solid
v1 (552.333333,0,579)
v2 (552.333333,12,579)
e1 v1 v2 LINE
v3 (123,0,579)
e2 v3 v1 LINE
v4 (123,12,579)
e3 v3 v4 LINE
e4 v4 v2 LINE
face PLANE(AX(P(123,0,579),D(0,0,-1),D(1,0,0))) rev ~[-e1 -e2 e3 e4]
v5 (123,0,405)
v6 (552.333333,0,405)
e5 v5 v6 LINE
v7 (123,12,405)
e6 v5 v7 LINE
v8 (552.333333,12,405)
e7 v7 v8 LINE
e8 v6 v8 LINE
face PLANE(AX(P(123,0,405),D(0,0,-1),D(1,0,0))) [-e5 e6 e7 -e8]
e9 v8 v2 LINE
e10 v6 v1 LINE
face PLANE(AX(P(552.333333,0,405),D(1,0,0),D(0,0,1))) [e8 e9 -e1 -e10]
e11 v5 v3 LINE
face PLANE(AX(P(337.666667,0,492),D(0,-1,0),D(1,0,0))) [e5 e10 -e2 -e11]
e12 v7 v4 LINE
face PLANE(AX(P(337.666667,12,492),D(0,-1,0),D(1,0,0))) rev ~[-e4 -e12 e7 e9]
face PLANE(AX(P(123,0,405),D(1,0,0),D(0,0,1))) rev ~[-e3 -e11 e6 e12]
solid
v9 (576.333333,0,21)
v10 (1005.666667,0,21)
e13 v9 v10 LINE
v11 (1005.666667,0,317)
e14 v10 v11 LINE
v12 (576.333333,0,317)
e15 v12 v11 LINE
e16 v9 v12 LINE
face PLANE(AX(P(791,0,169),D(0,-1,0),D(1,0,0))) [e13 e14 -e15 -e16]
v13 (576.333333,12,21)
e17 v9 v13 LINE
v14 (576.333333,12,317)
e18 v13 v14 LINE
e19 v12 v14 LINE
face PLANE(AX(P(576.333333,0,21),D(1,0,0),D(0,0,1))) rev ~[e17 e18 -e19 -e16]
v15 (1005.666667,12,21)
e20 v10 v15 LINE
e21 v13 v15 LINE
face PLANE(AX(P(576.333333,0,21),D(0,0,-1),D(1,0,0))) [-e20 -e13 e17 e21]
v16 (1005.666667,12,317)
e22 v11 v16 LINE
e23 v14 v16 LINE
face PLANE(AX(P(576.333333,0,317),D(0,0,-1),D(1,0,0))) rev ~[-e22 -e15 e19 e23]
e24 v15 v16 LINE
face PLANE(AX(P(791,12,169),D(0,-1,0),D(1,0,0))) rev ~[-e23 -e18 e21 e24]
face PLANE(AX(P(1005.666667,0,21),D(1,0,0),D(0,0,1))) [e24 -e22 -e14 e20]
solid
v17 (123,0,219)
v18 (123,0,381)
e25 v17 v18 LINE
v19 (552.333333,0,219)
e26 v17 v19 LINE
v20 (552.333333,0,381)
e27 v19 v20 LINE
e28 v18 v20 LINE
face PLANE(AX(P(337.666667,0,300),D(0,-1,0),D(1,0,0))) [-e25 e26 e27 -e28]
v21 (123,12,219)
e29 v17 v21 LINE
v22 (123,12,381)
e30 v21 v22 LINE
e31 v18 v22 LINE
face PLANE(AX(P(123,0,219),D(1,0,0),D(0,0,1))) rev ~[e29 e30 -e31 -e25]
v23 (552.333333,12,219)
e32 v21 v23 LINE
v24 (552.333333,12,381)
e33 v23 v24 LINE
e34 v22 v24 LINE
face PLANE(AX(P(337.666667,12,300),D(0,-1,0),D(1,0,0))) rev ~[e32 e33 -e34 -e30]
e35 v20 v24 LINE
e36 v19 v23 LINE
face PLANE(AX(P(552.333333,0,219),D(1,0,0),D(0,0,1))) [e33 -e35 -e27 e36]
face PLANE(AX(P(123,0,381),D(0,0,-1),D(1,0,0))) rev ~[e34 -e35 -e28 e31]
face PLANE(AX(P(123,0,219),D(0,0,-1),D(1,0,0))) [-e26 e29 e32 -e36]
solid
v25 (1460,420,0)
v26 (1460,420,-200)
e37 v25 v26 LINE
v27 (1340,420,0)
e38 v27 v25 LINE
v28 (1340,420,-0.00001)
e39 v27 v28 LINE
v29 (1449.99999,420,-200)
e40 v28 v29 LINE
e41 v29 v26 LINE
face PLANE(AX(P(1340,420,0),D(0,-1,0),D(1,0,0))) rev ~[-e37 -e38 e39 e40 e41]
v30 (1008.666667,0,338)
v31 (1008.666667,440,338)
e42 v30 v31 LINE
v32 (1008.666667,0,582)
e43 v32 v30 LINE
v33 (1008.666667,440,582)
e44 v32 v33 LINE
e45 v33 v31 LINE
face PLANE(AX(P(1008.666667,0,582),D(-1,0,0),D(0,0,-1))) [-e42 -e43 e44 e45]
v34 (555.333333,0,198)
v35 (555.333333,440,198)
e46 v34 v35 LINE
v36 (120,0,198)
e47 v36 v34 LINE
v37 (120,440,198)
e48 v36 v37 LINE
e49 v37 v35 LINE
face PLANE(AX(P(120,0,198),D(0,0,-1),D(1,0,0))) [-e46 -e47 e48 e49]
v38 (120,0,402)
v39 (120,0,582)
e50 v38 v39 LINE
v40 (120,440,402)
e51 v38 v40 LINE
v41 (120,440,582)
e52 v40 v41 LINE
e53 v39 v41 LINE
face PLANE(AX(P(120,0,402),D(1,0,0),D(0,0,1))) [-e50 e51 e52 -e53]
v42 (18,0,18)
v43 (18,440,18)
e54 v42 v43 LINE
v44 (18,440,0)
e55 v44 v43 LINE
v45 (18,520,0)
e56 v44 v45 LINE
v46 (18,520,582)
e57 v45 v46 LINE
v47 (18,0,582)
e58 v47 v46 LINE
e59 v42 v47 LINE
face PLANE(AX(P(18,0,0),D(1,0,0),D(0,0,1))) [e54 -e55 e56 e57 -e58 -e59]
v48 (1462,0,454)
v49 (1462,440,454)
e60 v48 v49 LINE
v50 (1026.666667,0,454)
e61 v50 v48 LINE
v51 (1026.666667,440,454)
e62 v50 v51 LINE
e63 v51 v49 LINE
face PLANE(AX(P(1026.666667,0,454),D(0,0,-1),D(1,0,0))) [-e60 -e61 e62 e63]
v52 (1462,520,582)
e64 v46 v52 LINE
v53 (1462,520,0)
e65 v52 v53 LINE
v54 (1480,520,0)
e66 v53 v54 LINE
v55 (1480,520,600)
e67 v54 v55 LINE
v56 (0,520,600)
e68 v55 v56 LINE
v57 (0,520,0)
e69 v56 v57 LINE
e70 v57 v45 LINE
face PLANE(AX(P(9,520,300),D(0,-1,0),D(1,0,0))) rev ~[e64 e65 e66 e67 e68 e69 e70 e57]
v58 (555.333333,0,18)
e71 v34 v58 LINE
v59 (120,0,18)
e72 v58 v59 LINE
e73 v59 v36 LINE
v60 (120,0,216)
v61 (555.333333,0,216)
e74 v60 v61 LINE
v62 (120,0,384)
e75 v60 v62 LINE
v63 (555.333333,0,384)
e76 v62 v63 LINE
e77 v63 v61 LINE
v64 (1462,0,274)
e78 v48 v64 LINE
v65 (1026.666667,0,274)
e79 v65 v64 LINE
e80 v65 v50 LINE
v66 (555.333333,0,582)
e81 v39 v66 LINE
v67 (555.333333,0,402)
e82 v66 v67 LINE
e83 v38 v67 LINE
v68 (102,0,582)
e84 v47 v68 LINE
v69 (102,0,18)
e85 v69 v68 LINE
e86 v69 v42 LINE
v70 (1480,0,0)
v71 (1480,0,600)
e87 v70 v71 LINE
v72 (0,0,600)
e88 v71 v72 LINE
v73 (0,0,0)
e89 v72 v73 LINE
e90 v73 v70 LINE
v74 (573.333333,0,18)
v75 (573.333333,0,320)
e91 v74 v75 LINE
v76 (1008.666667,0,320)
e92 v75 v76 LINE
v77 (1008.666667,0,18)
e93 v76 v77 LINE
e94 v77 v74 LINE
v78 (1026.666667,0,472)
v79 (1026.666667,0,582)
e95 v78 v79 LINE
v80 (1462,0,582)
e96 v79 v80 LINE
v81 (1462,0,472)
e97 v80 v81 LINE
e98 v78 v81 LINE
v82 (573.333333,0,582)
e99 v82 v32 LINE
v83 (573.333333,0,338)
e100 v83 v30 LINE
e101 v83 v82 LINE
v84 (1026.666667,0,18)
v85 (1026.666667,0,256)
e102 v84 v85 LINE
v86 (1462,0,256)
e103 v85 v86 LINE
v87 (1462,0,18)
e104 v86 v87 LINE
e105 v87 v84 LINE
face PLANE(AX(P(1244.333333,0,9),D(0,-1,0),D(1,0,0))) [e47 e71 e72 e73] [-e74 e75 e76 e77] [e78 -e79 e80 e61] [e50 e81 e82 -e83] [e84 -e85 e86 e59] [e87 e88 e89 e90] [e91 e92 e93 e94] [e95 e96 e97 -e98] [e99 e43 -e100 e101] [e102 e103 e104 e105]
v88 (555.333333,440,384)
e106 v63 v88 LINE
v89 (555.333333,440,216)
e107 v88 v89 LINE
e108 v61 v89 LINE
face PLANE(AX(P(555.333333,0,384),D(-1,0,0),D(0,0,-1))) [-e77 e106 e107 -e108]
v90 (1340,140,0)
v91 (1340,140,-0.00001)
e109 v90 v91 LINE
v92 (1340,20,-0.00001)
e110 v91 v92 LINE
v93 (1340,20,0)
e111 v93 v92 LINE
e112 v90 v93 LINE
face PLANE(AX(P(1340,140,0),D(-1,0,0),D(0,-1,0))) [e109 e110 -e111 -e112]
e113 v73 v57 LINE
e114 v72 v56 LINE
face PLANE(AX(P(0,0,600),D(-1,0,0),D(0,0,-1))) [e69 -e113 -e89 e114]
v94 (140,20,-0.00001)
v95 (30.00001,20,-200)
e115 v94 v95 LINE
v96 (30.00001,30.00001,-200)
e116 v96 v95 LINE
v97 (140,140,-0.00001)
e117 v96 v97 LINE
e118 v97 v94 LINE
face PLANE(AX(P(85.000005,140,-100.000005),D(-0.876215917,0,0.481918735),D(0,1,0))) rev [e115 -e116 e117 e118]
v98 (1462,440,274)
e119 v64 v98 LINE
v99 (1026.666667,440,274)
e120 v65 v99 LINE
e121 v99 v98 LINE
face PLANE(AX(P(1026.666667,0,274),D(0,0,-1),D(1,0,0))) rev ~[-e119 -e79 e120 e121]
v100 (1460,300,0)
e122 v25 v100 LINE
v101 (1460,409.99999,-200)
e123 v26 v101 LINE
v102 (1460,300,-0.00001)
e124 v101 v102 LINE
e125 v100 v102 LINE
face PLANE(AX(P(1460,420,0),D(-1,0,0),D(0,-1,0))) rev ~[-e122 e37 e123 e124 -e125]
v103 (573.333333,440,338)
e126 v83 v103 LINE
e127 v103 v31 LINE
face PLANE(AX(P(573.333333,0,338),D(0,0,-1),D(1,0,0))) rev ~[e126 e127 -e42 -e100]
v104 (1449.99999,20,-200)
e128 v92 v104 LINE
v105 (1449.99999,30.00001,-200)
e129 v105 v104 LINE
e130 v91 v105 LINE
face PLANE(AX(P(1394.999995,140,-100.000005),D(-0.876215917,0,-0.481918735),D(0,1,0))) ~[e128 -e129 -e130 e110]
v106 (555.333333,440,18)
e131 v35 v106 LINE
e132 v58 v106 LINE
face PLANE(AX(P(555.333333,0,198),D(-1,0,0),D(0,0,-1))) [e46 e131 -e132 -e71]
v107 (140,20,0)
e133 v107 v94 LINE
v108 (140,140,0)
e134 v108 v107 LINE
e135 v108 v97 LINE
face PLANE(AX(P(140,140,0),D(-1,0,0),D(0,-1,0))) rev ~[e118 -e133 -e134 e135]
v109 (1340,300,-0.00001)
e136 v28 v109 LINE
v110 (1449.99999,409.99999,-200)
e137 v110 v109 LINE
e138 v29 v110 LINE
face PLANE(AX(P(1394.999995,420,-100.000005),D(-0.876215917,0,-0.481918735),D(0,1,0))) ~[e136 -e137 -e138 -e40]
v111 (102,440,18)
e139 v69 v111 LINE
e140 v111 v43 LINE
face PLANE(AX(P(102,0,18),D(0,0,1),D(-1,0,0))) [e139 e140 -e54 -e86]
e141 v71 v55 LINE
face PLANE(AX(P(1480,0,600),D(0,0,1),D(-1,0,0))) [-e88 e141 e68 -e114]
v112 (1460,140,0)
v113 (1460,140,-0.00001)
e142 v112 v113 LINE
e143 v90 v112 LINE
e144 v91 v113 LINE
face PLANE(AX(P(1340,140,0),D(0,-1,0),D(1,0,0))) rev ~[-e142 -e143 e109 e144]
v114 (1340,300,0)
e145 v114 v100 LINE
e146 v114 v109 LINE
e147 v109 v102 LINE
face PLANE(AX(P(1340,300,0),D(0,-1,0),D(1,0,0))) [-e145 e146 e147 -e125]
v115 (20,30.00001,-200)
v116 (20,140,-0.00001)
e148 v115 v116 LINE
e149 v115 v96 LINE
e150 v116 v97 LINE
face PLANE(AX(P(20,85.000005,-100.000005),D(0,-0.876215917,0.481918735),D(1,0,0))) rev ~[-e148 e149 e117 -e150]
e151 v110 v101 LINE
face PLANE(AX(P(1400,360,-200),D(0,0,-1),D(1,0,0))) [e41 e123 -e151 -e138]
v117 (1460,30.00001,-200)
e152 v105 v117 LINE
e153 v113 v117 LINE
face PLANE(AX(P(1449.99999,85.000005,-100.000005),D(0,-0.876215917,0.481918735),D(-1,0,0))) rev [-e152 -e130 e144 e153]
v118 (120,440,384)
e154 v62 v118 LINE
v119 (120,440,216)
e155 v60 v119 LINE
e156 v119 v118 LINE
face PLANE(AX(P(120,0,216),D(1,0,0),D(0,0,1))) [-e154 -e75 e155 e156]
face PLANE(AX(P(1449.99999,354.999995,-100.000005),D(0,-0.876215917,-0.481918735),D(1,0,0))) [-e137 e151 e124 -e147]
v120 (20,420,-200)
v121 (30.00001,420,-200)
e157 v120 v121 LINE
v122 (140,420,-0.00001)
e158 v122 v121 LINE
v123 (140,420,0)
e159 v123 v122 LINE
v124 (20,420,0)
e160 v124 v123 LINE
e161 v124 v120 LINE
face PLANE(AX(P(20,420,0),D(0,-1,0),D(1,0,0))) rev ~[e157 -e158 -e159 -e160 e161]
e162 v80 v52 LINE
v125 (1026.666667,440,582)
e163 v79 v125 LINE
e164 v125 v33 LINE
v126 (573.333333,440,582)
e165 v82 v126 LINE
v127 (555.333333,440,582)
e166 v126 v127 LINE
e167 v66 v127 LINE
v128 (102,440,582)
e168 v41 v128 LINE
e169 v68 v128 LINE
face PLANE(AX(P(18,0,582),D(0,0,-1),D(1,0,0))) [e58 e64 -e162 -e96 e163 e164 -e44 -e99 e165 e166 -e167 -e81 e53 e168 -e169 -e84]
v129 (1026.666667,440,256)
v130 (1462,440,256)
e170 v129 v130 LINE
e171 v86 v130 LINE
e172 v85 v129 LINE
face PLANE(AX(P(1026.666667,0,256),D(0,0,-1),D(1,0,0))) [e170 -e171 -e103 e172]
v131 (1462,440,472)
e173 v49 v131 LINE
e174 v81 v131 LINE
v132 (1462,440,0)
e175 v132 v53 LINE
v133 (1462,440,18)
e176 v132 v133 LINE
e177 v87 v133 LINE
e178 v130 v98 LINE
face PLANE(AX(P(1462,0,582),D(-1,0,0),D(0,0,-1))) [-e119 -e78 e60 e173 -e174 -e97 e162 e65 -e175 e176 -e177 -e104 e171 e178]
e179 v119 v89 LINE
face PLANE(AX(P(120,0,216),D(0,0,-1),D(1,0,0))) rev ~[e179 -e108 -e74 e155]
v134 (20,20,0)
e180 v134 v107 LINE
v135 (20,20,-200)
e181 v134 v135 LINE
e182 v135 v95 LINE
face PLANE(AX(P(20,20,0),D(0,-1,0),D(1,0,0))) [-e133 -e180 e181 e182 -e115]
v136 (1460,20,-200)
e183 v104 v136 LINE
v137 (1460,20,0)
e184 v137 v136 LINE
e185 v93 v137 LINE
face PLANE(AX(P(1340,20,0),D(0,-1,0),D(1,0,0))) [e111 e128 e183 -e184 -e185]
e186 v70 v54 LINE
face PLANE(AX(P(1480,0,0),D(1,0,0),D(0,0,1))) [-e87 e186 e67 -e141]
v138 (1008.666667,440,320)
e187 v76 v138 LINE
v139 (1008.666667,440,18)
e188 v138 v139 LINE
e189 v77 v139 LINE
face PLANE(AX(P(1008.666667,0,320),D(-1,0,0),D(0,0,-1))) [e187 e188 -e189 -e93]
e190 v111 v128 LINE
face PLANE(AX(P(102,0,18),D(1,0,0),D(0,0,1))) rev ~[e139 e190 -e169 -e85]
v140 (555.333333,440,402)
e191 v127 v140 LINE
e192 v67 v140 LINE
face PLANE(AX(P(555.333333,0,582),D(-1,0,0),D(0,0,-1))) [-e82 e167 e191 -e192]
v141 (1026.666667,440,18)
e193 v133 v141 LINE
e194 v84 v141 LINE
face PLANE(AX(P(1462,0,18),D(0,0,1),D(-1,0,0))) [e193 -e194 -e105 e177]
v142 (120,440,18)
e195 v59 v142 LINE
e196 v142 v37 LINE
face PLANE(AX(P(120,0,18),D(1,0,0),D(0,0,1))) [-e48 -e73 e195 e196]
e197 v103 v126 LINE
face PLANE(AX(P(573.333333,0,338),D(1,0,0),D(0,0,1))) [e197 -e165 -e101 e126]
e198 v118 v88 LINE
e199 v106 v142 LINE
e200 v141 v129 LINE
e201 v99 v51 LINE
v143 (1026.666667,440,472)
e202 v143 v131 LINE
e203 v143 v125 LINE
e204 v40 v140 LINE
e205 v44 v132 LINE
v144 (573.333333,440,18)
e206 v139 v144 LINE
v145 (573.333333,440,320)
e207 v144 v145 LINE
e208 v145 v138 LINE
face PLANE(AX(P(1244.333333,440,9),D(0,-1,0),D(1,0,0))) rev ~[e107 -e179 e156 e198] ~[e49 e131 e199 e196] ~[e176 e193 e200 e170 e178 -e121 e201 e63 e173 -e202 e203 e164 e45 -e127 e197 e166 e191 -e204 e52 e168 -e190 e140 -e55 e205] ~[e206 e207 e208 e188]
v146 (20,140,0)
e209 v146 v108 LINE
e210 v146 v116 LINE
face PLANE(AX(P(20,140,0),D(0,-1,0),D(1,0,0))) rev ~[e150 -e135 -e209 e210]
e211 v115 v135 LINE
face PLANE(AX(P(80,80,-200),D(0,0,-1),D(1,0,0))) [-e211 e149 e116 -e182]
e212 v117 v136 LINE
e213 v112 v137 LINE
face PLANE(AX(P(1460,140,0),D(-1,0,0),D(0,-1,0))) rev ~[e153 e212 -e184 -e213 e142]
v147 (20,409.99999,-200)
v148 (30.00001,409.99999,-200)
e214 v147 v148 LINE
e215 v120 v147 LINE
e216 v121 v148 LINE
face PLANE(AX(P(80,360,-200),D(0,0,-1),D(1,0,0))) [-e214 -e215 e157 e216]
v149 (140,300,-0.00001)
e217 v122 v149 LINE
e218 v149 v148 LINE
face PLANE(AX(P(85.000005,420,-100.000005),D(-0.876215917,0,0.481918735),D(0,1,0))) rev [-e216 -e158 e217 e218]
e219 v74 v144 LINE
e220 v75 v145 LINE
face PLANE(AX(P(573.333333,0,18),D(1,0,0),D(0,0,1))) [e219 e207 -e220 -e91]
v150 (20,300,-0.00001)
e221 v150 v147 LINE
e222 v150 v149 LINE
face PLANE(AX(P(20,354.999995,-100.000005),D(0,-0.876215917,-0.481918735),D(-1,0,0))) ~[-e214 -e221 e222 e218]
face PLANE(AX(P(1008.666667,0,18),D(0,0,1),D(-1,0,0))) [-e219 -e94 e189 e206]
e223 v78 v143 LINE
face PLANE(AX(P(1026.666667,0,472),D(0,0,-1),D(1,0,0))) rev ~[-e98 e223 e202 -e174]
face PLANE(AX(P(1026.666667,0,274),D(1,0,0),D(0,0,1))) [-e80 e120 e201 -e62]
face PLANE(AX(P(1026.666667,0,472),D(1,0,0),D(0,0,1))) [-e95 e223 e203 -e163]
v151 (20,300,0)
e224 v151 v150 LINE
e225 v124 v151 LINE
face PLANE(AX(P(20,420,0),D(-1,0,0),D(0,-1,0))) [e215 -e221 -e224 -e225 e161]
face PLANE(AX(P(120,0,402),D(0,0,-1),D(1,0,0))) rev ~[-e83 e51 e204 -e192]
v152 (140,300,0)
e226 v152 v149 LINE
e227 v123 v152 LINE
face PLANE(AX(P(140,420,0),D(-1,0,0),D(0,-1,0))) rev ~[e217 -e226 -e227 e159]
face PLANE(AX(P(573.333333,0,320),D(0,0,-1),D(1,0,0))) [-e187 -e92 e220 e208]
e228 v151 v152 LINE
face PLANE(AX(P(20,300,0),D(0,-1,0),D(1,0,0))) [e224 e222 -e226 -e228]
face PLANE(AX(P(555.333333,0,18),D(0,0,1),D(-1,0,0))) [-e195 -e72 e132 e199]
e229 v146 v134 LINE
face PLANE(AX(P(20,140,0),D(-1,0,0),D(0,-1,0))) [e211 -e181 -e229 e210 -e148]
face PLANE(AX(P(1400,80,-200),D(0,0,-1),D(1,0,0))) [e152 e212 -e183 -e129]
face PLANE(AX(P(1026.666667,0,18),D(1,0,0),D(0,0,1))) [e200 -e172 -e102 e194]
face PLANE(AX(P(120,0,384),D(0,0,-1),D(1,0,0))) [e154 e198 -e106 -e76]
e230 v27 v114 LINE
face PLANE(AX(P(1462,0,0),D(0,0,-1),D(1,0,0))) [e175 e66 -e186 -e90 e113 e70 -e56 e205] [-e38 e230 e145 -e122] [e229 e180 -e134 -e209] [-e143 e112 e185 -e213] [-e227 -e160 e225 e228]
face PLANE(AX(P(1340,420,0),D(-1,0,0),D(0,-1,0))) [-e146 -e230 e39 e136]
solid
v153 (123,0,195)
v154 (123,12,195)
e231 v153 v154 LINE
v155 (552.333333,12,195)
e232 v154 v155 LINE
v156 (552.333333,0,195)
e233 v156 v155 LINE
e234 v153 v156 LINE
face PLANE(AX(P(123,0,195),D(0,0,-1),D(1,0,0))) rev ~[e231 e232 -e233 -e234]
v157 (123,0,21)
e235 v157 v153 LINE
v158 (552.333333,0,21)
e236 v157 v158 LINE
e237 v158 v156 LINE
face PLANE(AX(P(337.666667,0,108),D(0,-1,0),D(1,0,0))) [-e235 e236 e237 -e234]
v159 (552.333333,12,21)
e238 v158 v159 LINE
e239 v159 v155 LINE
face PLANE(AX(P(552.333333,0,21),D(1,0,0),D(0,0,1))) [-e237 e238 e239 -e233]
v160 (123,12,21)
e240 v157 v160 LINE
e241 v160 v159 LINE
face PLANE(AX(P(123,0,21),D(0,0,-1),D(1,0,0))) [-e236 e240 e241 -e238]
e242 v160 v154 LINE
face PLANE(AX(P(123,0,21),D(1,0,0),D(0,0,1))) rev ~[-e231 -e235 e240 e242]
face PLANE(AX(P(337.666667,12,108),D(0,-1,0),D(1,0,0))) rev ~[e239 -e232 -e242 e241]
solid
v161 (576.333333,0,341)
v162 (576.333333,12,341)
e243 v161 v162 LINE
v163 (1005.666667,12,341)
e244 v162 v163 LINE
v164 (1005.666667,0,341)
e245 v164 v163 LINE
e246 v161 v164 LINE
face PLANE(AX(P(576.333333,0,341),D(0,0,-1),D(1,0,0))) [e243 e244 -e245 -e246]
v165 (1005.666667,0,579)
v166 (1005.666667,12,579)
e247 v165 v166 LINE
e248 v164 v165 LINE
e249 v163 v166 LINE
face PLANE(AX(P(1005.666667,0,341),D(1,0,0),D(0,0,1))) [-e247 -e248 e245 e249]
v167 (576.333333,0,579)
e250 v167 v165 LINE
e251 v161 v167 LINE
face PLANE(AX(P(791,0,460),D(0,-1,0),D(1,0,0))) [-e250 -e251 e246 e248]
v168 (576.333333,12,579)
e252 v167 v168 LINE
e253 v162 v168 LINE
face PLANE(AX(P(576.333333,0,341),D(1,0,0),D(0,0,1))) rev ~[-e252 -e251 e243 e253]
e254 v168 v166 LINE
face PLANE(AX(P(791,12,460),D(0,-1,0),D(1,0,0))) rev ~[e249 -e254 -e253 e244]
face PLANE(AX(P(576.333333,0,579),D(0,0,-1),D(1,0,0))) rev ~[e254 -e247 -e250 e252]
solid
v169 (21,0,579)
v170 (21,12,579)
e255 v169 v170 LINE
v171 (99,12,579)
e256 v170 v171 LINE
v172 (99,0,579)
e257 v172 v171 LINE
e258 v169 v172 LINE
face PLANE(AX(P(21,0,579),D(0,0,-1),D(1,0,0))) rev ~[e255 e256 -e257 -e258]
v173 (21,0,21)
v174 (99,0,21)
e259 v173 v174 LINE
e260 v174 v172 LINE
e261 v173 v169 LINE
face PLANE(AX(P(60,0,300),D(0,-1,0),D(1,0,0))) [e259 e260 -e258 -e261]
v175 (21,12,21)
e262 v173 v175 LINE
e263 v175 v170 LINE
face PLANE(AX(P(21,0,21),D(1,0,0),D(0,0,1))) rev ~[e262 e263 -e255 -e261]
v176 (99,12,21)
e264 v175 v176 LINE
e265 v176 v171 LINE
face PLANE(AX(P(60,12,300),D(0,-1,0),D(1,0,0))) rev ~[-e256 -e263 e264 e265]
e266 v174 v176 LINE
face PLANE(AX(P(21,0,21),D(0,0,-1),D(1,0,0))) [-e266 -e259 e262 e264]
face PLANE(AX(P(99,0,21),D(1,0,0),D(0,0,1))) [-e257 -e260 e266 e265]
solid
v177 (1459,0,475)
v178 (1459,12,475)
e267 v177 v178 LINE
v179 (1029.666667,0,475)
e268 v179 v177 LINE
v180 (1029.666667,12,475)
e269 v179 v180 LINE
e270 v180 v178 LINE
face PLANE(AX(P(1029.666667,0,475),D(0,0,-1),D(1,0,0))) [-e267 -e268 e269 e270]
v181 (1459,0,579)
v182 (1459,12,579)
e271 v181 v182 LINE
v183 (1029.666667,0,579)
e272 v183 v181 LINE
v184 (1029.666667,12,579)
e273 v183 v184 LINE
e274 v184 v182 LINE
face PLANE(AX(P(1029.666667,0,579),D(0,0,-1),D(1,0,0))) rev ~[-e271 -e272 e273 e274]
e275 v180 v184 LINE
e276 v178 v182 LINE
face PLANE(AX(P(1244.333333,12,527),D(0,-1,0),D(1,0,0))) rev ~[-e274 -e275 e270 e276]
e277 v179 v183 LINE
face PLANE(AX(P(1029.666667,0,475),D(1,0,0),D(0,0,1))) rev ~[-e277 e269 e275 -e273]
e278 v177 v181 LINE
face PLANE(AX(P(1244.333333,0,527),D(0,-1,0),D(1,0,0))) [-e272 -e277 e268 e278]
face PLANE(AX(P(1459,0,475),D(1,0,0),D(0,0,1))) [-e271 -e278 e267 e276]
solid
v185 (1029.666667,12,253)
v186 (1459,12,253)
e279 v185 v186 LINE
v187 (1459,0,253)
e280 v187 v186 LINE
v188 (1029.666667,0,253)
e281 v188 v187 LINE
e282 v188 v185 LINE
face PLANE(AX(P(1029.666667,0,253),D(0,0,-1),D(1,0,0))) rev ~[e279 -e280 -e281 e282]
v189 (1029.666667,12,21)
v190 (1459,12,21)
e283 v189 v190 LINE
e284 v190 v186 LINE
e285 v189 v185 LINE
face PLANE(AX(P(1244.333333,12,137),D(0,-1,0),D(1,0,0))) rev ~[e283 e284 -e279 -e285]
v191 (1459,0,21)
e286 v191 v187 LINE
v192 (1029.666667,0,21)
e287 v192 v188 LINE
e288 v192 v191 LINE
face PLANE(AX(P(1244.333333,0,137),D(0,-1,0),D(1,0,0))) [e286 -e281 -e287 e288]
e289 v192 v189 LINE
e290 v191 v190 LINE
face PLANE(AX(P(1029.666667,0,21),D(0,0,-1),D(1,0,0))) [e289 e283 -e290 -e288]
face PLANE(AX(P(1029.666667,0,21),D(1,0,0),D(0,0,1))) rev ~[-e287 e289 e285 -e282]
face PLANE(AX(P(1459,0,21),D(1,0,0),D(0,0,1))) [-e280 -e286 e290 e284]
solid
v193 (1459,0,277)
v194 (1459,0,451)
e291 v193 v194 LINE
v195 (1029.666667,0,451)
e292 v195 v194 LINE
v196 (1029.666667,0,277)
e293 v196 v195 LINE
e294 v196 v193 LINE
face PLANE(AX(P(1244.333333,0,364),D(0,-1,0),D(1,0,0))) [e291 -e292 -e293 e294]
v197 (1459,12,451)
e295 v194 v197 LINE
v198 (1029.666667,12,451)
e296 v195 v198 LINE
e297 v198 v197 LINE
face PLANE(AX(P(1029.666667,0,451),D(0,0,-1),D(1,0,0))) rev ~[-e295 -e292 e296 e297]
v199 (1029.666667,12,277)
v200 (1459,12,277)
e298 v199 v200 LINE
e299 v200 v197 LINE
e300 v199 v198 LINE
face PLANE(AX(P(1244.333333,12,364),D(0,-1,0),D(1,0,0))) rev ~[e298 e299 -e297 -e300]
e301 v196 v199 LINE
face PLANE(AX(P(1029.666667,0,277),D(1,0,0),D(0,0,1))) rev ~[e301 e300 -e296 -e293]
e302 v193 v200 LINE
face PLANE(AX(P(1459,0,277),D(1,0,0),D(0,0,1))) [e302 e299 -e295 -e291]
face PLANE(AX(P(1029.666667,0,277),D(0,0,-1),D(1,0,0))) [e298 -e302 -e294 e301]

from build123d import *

# Parameters (mm, degrees)
F2_W        = 18
F2_H        = 564
F2_H_2      = 18
F2_W_2      = 84
F2_W_3      = 9
F2_W_4      = 435.3333333333
F3_DEPTH    = 520
F4_DEPTH    = 440
F5_W        = 78
F5_H        = 558
F6_DEPTH    = 12
F5_W_2      = 429.3333333333
F5_H_2      = 174
F5_H_3      = 162
F5_H_4      = 238
F5_H_5      = 296
F5_H_6      = 232
F5_H_7      = 104
F7_W        = 120
F7_H        = 120
F8_DEPTH    = 200
F9_SIZE2    = 109.99999
F9_SIZE     = 199.99999
F9_2_SIZE2  = 109.99999
F9_2_SIZE   = 199.99999
F10_SIZE2   = 199.99999
F10_SIZE    = 109.99999
F10_2_SIZE2 = 199.99999
F10_2_SIZE  = 109.99999
F11_SIZE2   = 109.99999
F11_SIZE    = 199.99999
F11_2_SIZE2 = 109.99999
F11_2_SIZE  = 199.99999
F12_SIZE2   = 109.99999
F12_SIZE    = 199.99999
F12_2_SIZE2 = 109.99999
F12_2_SIZE  = 199.99999


# Not quite as in the source:
# - a fillet or chamfer is up to 0.001 mm smaller than in the source, because OpenCascade refuses the exact size


with BuildPart() as f3:
    # F2 (on Front) → F3 (new body)
    with BuildSketch(Plane.XZ):
        with Locations((9, 300)):
            Rectangle(F2_W, F2_H)
        with Locations((9, 591)):
            Rectangle(F2_W, F2_H_2)
        with Locations((60, 591)):
            Rectangle(F2_W_2, F2_H_2)
        with Locations((115.5, 591)):
            Rectangle(F2_W_3, F2_H_2)
        with Locations((337.6666666667, 591)):
            Rectangle(F2_W_4, F2_H_2)
        with Locations((559.8333333333, 591)):
            Rectangle(F2_W_3, F2_H_2)
        with Locations((568.8333333333, 591)):
            Rectangle(F2_W_3, F2_H_2)
        with Locations((791, 591)):
            Rectangle(F2_W_4, F2_H_2)
        with Locations((1013.1666666667, 591)):
            Rectangle(F2_W_3, F2_H_2)
        with Locations((1022.1666666667, 591)):
            Rectangle(F2_W_3, F2_H_2)
        with Locations((1244.3333333333, 591)):
            Rectangle(F2_W_4, F2_H_2)
        with Locations((1475.5, 591)):
            Rectangle(F2_W_3, F2_H_2)
        with Locations((1475.5, 300)):
            Rectangle(F2_W_3, F2_H)
        with Locations((1475.5, 9)):
            Rectangle(F2_W_3, F2_H_2)
        with Locations((9, 9)):
            Rectangle(F2_W, F2_H_2)
        with Locations((106.5, 591)):
            Rectangle(F2_W_3, F2_H_2)
        with Locations((1466.5, 591)):
            Rectangle(F2_W_3, F2_H_2)
        Polygon((1462, 256), (1462, 18), (1471, 18), (1471, 582), (1462, 582), (1462, 472), (1462, 454), (1462, 274), align=None)
        with Locations((1466.5, 9)):
            Rectangle(F2_W_3, F2_H_2)
    extrude(amount=-F3_DEPTH)

    # F2 (on Front) → F4 (join)
    with BuildSketch(Plane.XZ):
        with Locations((1244.3333333333, 9)):
            Rectangle(F2_W_4, F2_H_2)
        with Locations((1022.1666666667, 9)):
            Rectangle(F2_W_3, F2_H_2)
        with Locations((1013.1666666667, 9)):
            Rectangle(F2_W_3, F2_H_2)
        with Locations((791, 9)):
            Rectangle(F2_W_4, F2_H_2)
        with Locations((568.8333333333, 9)):
            Rectangle(F2_W_3, F2_H_2)
        with Locations((559.8333333333, 9)):
            Rectangle(F2_W_3, F2_H_2)
        with Locations((337.6666666667, 9)):
            Rectangle(F2_W_4, F2_H_2)
        with Locations((115.5, 9)):
            Rectangle(F2_W_3, F2_H_2)
        with Locations((60, 9)):
            Rectangle(F2_W_2, F2_H_2)
        Polygon((111, 582), (111, 18), (120, 18), (120, 198), (120, 216), (120, 384), (120, 402), (120, 582), align=None)
        Polygon((555.3333333333, 198), (555.3333333333, 18), (564.3333333333, 18), (564.3333333333, 582), (555.3333333333, 582), (555.3333333333, 402), (555.3333333333, 384), (555.3333333333, 216), align=None)
        Polygon((564.3333333333, 582), (564.3333333333, 18), (573.3333333333, 18), (573.3333333333, 320), (573.3333333333, 338), (573.3333333333, 582), align=None)
        Polygon((1008.6666666667, 320), (1008.6666666667, 18), (1017.6666666667, 18), (1017.6666666667, 582), (1008.6666666667, 582), (1008.6666666667, 338), align=None)
        Polygon((1017.6666666667, 582), (1017.6666666667, 18), (1026.6666666667, 18), (1026.6666666667, 256), (1026.6666666667, 274), (1026.6666666667, 454), (1026.6666666667, 472), (1026.6666666667, 582), align=None)
        with Locations((106.5, 9)):
            Rectangle(F2_W_3, F2_H_2)
        with Locations((106.5, 300)):
            Rectangle(F2_W_3, F2_H)
        with Locations((337.6666666667, 393)):
            Rectangle(F2_W_4, F2_H_2)
        with Locations((337.6666666667, 207)):
            Rectangle(F2_W_4, F2_H_2)
        with Locations((791, 329)):
            Rectangle(F2_W_4, F2_H_2)
        with Locations((1244.3333333333, 463)):
            Rectangle(F2_W_4, F2_H_2)
        with Locations((1244.3333333333, 265)):
            Rectangle(F2_W_4, F2_H_2)
    extrude(amount=-F4_DEPTH)

    # F7 (on face) → F8 (join)
    with BuildSketch(Plane(origin=(0, 0, 0), x_dir=(1, 0, 0), z_dir=(0, 0, -1))):
        with Locations((80, -80)):
            Rectangle(F7_W, F7_H)
        with Locations((1400, -80)):
            Rectangle(F7_W, F7_H)
        with Locations((80, -360)):
            Rectangle(F7_W, F7_H)
        with Locations((1400, -360)):
            Rectangle(F7_W, F7_H)
    extrude(amount=F8_DEPTH)

    # F9 (size 200 and 110 in the source; OpenCascade refuses exactly that, so slightly less here)
    f9_edges = [f3.edges().sort_by_distance(p)[0] for p in [
        (140, 80, -200),
    ]]
    f9_side = f3.faces().sort_by_distance((140, 80, -100))[0]
    chamfer(f9_edges, length=F9_SIZE, length2=F9_SIZE2, reference=f9_side)

    # F9#2 (size 200 and 110 in the source; OpenCascade refuses exactly that, so slightly less here)
    f9_2_edges = [f3.edges().sort_by_distance(p)[0] for p in [
        (1340, 360, -200),
    ]]
    f9_2_side = f3.faces().sort_by_distance((1340, 360, -100))[0]
    chamfer(f9_2_edges, length=F9_2_SIZE, length2=F9_2_SIZE2, reference=f9_2_side)

    # F10 (size 110 and 200 in the source; OpenCascade refuses exactly that, so slightly less here)
    f10_edges = [f3.edges().sort_by_distance(p)[0] for p in [
        (25.000005, 140, -200),
    ]]
    f10_side = f3.faces().sort_by_distance((25.000005, 80, -200))[0]
    chamfer(f10_edges, length=F10_SIZE, length2=F10_SIZE2, reference=f10_side)

    # F10#2 (size 110 and 200 in the source; OpenCascade refuses exactly that, so slightly less here)
    f10_2_edges = [f3.edges().sort_by_distance(p)[0] for p in [
        (1454.999995, 300, -200),
    ]]
    f10_2_side = f3.faces().sort_by_distance((1454.999995, 360, -200))[0]
    chamfer(f10_2_edges, length=F10_2_SIZE, length2=F10_2_SIZE2, reference=f10_2_side)

    # F11 (size 200 and 110 in the source; OpenCascade refuses exactly that, so slightly less here)
    f11_edges = [f3.edges().sort_by_distance(p)[0] for p in [
        (140, 360, -200),
    ]]
    f11_side = f3.faces().sort_by_distance((140, 360, -100))[0]
    chamfer(f11_edges, length=F11_SIZE, length2=F11_SIZE2, reference=f11_side)

    # F11#2 (size 200 and 110 in the source; OpenCascade refuses exactly that, so slightly less here)
    f11_2_edges = [f3.edges().sort_by_distance(p)[0] for p in [
        (1340, 80, -200),
    ]]
    f11_2_side = f3.faces().sort_by_distance((1340, 80, -100))[0]
    chamfer(f11_2_edges, length=F11_2_SIZE, length2=F11_2_SIZE2, reference=f11_2_side)

    # F12 (size 200 and 110 in the source; OpenCascade refuses exactly that, so slightly less here)
    f12_edges = [f3.edges().sort_by_distance(p)[0] for p in [
        (25.000005, 300, -200),
    ]]
    f12_side = f3.faces().sort_by_distance((60.256413, 300, -71.794876))[0]
    chamfer(f12_edges, length=F12_SIZE, length2=F12_SIZE2, reference=f12_side)

    # F12#2 (size 200 and 110 in the source; OpenCascade refuses exactly that, so slightly less here)
    f12_2_edges = [f3.edges().sort_by_distance(p)[0] for p in [
        (1454.999995, 140, -200),
    ]]
    f12_2_side = f3.faces().sort_by_distance((1419.743587, 140, -71.794876))[0]
    chamfer(f12_2_edges, length=F12_2_SIZE, length2=F12_2_SIZE2, reference=f12_2_side)


with BuildPart() as f6:
    # F5 (on Front) → F6 (new body)
    with BuildSketch(Plane.XZ):
        with Locations((60, 300)):
            Rectangle(F5_W, F5_H)
    extrude(amount=-F6_DEPTH)


with BuildPart() as f6b:
    # F5 (on Front) → F6, piece 2 (new body)
    with BuildSketch(Plane.XZ):
        with Locations((337.6666666667, 492)):
            Rectangle(F5_W_2, F5_H_2)
    extrude(amount=-F6_DEPTH)


with BuildPart() as f6c:
    # F5 (on Front) → F6, piece 3 (new body)
    with BuildSketch(Plane.XZ):
        with Locations((337.6666666667, 300)):
            Rectangle(F5_W_2, F5_H_3)
    extrude(amount=-F6_DEPTH)


with BuildPart() as f6d:
    # F5 (on Front) → F6, piece 4 (new body)
    with BuildSketch(Plane.XZ):
        with Locations((337.6666666667, 108)):
            Rectangle(F5_W_2, F5_H_2)
    extrude(amount=-F6_DEPTH)


with BuildPart() as f6e:
    # F5 (on Front) → F6, piece 5 (new body)
    with BuildSketch(Plane.XZ):
        with Locations((791, 460)):
            Rectangle(F5_W_2, F5_H_4)
    extrude(amount=-F6_DEPTH)


with BuildPart() as f6f:
    # F5 (on Front) → F6, piece 6 (new body)
    with BuildSketch(Plane.XZ):
        with Locations((791, 169)):
            Rectangle(F5_W_2, F5_H_5)
    extrude(amount=-F6_DEPTH)


with BuildPart() as f6g:
    # F5 (on Front) → F6, piece 7 (new body)
    with BuildSketch(Plane.XZ):
        with Locations((1244.3333333333, 137)):
            Rectangle(F5_W_2, F5_H_6)
    extrude(amount=-F6_DEPTH)


with BuildPart() as f6h:
    # F5 (on Front) → F6, piece 8 (new body)
    with BuildSketch(Plane.XZ):
        with Locations((1244.3333333333, 364)):
            Rectangle(F5_W_2, F5_H_2)
    extrude(amount=-F6_DEPTH)


with BuildPart() as f6i:
    # F5 (on Front) → F6, piece 9 (new body)
    with BuildSketch(Plane.XZ):
        with Locations((1244.3333333333, 527)):
            Rectangle(F5_W_2, F5_H_7)
    extrude(amount=-F6_DEPTH)


solid = Compound([f3.part, f6.part, f6b.part, f6c.part, f6d.part, f6e.part, f6f.part, f6g.part, f6h.part, f6i.part])
